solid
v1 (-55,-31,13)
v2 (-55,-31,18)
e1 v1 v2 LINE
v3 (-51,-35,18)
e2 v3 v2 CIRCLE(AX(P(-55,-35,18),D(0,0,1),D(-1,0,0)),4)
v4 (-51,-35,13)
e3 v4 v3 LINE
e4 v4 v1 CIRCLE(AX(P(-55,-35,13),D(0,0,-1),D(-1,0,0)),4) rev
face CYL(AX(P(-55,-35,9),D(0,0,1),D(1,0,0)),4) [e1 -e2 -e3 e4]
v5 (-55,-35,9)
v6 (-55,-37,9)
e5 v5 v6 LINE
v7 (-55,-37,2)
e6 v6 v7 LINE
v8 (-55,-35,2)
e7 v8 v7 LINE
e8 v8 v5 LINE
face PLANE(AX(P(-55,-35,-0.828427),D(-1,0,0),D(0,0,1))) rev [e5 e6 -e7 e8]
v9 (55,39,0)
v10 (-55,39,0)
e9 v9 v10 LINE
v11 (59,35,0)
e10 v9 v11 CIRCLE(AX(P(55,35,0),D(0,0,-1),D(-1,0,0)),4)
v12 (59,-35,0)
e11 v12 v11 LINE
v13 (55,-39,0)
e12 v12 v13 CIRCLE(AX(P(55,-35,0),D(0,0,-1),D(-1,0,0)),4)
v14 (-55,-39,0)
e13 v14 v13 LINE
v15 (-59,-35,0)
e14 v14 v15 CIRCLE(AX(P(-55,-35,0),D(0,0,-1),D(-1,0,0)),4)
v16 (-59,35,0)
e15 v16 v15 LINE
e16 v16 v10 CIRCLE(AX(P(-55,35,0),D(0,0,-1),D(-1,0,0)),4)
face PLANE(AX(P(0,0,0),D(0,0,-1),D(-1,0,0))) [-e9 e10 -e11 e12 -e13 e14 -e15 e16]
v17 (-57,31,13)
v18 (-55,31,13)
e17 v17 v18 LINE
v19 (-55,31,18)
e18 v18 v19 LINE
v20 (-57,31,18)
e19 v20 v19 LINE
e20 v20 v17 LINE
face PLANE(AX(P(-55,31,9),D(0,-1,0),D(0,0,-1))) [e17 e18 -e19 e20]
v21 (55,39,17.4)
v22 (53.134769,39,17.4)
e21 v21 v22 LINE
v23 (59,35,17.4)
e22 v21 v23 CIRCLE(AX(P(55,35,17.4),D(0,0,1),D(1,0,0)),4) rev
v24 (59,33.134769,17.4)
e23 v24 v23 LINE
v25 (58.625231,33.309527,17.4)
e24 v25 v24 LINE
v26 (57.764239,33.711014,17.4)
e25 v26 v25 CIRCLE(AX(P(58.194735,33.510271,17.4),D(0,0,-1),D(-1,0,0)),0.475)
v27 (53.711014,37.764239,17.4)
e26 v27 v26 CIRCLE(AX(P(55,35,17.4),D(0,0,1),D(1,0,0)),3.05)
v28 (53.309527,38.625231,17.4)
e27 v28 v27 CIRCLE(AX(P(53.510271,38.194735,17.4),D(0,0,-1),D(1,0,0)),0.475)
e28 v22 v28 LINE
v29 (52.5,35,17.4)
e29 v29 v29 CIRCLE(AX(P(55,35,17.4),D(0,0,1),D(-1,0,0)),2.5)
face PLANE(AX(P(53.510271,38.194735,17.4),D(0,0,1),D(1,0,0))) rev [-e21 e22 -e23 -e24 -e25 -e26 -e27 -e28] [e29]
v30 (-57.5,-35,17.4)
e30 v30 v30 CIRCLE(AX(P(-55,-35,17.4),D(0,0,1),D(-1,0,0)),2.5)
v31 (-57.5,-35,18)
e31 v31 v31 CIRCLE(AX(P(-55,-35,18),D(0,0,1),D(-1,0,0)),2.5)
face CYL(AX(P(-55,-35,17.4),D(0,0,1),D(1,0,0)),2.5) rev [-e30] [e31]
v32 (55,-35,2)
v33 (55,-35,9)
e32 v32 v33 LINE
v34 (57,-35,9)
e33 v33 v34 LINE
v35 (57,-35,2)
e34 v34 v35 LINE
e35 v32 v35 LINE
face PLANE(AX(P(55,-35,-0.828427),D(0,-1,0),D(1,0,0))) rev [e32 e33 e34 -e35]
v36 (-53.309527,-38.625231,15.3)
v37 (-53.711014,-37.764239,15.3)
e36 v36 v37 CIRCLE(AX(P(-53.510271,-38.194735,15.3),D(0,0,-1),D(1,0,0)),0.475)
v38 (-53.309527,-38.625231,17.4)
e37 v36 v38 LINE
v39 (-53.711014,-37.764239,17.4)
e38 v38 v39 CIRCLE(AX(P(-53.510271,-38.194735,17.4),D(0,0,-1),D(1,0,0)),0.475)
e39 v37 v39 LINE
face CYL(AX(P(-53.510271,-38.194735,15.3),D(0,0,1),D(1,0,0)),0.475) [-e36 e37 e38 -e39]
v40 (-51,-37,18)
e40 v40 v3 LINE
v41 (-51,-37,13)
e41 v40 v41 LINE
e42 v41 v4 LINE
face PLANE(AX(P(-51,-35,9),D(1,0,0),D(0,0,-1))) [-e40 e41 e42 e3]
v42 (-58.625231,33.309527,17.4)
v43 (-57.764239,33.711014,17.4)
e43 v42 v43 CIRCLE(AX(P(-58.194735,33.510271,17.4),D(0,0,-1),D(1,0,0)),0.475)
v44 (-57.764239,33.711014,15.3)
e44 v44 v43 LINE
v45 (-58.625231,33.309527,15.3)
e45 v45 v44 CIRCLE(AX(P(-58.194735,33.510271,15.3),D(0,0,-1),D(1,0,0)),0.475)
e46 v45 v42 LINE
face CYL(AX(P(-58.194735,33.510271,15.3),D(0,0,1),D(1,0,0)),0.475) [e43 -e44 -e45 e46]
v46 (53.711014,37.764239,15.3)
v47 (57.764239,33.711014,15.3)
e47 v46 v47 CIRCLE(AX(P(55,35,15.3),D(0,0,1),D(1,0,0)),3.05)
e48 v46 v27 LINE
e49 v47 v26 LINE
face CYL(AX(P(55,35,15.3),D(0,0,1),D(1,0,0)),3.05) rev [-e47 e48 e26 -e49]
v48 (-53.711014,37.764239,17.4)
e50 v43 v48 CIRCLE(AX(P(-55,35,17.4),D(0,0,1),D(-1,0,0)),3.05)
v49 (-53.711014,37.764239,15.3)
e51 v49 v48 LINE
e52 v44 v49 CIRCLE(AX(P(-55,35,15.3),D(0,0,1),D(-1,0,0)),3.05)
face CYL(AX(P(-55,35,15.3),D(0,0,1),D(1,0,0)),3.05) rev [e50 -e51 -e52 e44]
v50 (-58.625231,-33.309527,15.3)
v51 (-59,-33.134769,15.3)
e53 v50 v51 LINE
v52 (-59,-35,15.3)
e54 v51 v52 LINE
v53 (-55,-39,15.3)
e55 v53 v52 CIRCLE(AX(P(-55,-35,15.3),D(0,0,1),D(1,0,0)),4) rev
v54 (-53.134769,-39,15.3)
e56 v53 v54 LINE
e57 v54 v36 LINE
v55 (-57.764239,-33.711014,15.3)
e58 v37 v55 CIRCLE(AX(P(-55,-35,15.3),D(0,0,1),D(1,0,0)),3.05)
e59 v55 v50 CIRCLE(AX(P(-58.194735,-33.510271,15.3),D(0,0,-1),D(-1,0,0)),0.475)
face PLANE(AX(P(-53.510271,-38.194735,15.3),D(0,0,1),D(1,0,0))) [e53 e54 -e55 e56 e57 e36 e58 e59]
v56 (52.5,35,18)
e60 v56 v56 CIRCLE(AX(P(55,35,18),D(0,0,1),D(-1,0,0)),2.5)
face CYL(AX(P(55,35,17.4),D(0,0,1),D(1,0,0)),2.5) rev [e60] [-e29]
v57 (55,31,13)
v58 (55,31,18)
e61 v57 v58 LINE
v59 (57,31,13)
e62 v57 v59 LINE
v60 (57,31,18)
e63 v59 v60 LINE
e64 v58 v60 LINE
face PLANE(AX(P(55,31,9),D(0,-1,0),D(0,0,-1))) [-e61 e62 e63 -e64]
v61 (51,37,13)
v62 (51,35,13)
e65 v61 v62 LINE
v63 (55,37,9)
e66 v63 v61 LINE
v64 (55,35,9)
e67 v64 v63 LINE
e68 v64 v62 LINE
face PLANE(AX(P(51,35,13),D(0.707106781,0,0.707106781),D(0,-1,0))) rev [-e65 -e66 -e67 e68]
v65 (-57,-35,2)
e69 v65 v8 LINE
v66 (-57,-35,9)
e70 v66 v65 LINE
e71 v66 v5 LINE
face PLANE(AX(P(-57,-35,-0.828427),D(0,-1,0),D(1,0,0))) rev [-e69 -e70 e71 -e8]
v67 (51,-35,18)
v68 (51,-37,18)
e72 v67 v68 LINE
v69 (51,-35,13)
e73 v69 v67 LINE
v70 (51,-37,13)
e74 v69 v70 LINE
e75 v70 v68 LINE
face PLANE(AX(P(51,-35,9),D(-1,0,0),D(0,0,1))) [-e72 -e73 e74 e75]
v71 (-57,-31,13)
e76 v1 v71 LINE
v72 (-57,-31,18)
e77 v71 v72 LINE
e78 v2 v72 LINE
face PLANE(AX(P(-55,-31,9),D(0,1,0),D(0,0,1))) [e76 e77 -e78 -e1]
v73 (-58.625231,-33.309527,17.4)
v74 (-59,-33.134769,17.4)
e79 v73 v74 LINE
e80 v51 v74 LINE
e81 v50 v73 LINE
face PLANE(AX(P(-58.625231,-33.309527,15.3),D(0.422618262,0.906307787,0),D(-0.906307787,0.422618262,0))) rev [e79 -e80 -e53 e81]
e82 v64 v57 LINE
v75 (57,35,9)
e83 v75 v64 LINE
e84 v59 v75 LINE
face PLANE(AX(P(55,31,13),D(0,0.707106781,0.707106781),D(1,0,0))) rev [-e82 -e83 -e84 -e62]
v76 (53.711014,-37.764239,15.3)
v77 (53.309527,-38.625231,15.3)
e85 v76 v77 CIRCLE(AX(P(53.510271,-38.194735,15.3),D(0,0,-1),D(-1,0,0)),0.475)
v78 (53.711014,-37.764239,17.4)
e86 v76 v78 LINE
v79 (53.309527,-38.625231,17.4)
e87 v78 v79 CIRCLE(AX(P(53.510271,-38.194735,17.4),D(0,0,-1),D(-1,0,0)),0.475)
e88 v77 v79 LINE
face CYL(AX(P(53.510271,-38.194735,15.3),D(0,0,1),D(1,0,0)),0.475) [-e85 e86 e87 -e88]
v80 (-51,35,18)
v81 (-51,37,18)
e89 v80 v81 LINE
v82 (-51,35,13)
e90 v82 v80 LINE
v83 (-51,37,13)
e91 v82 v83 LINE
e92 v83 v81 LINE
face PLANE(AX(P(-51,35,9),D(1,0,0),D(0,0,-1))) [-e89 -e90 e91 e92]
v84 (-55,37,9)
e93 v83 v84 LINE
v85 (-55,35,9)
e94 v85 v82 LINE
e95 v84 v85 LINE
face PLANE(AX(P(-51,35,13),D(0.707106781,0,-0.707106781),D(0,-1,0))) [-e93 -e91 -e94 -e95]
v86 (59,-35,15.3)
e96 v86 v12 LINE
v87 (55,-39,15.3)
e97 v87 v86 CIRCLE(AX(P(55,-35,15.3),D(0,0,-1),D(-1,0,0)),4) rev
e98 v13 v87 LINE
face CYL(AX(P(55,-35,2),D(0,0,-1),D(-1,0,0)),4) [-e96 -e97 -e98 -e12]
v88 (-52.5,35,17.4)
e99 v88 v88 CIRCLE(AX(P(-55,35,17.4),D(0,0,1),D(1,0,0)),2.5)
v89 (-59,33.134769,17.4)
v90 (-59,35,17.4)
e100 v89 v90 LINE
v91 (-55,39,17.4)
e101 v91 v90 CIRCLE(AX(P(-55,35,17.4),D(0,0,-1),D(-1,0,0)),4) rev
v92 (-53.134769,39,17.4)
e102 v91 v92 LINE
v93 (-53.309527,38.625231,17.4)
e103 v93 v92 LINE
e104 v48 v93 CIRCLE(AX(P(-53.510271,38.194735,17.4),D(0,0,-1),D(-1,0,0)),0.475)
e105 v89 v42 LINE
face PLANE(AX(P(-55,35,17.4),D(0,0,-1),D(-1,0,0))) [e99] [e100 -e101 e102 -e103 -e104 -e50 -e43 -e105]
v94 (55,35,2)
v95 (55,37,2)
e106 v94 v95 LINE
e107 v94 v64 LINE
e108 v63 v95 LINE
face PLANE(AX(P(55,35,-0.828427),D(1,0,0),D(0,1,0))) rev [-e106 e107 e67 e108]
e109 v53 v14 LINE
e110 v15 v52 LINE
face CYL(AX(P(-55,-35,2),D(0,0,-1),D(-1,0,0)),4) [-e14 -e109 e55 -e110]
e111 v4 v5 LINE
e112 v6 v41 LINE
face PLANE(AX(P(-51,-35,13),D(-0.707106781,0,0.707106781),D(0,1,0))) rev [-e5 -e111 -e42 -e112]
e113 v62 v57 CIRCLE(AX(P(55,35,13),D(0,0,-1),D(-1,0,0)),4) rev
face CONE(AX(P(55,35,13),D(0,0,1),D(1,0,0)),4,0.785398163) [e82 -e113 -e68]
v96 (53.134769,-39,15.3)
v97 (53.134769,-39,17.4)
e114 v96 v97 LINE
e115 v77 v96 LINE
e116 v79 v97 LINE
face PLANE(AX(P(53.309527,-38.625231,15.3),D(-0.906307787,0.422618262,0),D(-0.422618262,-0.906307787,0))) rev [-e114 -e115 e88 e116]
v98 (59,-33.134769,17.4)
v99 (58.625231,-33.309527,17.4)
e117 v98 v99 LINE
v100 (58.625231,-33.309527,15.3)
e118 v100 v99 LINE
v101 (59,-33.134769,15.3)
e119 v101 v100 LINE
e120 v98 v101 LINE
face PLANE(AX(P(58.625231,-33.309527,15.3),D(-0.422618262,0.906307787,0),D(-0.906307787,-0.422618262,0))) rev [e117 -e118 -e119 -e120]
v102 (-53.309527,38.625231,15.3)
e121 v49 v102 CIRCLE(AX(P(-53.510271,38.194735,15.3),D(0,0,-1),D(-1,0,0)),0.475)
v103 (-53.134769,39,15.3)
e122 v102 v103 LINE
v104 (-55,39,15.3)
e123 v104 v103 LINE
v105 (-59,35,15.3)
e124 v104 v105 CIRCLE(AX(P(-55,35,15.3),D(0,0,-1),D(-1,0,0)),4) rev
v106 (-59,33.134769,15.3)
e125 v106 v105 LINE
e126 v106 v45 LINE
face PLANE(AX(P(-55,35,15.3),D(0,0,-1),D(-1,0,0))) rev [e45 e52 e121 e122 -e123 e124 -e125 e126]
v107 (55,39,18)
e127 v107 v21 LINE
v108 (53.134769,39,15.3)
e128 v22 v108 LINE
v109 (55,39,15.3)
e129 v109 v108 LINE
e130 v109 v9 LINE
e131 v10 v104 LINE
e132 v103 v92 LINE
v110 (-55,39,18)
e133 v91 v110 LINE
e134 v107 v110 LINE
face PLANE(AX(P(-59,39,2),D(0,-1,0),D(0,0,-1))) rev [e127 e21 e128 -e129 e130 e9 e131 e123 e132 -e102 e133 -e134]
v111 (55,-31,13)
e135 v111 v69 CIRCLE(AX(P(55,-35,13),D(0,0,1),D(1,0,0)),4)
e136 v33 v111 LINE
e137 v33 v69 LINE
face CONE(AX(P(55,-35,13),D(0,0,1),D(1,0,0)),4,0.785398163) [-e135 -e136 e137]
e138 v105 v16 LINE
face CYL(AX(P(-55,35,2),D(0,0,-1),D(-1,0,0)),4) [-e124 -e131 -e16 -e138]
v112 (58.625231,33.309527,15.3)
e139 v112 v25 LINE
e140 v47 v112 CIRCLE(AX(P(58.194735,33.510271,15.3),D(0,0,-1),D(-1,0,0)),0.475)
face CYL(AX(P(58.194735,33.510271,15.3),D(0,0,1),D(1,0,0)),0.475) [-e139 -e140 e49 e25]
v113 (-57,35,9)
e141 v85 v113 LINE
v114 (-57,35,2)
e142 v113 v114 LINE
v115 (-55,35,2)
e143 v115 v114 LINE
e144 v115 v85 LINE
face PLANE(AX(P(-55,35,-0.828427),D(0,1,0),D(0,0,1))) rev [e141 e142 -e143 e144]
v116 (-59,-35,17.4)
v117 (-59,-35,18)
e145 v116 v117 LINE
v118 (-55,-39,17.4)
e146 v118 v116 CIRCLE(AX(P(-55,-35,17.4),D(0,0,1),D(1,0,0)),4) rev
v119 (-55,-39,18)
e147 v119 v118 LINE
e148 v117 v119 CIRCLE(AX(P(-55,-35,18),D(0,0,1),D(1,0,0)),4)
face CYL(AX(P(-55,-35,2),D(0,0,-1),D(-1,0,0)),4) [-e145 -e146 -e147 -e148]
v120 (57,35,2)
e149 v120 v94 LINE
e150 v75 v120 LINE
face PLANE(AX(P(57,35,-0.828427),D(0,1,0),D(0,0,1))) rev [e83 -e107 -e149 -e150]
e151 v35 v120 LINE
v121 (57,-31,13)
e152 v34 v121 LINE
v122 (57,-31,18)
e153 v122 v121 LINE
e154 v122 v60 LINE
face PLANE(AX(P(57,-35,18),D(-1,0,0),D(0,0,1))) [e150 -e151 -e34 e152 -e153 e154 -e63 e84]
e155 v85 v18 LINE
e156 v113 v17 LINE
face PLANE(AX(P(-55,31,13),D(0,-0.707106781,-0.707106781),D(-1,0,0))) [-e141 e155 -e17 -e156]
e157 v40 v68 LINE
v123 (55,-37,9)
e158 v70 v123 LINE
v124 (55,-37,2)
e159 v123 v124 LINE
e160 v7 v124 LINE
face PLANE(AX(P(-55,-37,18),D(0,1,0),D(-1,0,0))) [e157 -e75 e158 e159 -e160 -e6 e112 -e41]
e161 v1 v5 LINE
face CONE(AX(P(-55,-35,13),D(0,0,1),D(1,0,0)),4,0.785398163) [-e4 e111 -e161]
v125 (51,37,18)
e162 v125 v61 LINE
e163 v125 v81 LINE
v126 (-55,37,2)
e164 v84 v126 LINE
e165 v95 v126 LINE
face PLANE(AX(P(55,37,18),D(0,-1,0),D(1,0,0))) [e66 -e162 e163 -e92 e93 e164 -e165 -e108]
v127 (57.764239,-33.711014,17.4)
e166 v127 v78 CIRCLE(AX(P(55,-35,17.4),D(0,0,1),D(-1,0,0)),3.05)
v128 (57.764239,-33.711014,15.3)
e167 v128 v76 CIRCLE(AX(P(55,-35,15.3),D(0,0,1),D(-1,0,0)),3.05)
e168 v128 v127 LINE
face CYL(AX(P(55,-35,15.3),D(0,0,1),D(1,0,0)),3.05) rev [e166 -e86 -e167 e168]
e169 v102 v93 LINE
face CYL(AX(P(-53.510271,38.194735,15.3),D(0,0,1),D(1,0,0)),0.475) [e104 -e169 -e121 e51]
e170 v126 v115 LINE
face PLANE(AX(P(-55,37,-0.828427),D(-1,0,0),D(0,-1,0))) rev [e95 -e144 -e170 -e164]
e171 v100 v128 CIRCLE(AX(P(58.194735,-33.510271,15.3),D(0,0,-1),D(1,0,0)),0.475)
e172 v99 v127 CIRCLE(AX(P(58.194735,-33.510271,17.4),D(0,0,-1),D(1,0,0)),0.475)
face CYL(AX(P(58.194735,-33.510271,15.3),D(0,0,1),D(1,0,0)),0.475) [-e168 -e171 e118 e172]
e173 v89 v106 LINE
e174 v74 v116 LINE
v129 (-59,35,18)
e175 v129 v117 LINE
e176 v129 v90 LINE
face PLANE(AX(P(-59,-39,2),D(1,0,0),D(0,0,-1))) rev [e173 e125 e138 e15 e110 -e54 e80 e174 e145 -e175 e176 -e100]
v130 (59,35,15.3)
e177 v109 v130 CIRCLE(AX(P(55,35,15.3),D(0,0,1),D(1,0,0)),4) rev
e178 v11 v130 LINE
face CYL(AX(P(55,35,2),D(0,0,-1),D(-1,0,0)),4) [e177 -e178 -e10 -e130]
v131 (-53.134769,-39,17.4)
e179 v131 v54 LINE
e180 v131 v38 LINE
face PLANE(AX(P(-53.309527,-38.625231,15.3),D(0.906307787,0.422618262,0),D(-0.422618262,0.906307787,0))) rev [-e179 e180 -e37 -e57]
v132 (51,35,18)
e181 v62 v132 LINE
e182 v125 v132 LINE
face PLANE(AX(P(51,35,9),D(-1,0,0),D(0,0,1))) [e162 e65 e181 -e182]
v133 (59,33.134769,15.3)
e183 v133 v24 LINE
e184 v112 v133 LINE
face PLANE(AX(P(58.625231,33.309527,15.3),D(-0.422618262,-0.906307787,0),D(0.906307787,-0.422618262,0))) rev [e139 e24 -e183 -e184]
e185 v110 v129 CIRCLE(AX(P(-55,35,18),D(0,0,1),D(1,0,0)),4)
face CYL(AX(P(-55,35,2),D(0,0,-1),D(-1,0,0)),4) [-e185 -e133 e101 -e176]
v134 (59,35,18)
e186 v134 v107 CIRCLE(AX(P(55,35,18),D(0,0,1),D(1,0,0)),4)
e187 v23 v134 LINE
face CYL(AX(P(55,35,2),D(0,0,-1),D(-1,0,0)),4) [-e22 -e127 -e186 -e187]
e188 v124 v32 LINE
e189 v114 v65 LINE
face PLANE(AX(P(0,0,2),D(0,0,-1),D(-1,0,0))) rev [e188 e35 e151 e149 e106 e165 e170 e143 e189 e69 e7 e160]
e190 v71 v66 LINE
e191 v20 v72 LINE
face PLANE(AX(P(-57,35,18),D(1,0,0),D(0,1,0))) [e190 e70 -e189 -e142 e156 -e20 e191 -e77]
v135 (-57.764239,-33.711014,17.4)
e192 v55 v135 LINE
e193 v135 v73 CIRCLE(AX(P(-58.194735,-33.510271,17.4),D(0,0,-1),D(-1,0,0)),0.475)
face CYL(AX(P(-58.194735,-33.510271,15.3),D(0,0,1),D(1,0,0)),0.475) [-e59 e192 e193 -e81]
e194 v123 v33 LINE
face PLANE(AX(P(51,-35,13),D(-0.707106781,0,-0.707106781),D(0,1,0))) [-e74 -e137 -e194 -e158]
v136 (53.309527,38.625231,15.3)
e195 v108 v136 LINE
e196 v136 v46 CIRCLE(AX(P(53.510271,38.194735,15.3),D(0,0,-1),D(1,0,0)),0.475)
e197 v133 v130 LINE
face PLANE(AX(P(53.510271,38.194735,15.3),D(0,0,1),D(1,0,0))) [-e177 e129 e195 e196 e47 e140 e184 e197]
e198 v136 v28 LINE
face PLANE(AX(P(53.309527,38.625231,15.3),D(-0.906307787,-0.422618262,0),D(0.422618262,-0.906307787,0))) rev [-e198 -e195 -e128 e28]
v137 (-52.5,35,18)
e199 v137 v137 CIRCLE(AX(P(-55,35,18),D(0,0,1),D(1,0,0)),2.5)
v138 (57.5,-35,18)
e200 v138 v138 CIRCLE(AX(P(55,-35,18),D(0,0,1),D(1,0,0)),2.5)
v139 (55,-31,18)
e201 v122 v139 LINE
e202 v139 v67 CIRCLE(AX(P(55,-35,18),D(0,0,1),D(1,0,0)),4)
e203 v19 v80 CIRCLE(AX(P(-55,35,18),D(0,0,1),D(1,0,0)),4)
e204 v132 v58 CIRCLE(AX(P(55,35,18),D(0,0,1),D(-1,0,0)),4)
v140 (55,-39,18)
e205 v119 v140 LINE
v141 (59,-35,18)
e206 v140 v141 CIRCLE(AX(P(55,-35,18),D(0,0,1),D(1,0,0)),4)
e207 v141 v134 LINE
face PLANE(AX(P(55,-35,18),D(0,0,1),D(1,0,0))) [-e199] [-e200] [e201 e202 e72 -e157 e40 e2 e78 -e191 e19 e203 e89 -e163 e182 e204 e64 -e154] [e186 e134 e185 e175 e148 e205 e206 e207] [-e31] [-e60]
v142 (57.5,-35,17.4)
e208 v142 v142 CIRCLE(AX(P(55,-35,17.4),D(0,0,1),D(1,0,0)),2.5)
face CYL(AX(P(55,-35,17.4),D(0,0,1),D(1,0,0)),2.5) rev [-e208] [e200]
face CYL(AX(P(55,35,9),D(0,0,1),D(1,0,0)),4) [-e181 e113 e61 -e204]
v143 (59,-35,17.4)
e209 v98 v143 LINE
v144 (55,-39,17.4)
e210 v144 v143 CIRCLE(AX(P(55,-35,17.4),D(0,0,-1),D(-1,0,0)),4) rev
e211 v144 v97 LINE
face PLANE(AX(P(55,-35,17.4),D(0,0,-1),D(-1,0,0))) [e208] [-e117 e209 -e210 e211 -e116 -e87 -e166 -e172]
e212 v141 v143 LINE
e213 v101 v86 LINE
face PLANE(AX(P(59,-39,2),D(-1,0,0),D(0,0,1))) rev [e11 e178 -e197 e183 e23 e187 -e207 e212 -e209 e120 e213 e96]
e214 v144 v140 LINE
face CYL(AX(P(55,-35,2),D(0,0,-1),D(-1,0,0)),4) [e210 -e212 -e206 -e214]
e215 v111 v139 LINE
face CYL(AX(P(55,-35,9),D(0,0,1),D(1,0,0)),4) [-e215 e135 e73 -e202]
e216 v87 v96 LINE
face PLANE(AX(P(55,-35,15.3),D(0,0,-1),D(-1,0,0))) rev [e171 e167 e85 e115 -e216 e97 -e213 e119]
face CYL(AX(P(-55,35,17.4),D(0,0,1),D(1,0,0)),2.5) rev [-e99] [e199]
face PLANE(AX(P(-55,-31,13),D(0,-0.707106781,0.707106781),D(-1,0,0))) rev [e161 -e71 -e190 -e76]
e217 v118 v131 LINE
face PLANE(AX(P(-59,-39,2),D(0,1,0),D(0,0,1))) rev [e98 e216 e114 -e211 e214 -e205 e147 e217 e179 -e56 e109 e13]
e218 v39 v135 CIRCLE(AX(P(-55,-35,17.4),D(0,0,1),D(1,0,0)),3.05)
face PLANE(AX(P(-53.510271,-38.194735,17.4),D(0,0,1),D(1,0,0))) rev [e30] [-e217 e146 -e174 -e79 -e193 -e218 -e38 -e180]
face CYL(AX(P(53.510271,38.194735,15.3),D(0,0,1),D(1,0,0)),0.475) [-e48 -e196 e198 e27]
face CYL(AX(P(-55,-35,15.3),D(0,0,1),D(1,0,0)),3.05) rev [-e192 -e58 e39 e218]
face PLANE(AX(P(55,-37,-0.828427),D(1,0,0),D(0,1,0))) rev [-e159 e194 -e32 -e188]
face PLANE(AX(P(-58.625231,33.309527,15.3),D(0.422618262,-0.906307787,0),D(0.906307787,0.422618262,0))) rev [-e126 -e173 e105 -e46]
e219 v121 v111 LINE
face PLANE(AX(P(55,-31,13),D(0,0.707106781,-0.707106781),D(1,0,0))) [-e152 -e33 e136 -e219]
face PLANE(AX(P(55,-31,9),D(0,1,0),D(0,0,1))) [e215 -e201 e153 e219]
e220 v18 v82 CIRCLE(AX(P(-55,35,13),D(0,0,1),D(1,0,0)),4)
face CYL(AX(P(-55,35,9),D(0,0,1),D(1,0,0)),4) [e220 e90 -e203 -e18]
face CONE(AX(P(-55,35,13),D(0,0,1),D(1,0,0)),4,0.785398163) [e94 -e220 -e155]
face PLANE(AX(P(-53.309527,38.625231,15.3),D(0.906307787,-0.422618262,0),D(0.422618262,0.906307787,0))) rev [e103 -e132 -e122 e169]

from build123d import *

# Parameters (mm, degrees)
SKETCH_1_W          = 118
SKETCH_1_H          = 78
EXTRUDE_1_DEPTH     = 2
FILLET_1_R          = 4
EXTRUDE_START       = 16
EXTRUDE_4_DEPTH     = 16
EXTRUDE_5_DEPTH     = 9
SKETCH_6_R          = 2.5
CUT_EXTRUDE_1_DEPTH = 0.6
CUT_EXTRUDE_2_DEPTH = 2.1
CHAMFER_1_SIZE      = 4
EXTRUDE_6_DEPTH     = 7


with BuildPart() as part:
    # 草图1 → 凸台-拉伸1 (new body)
    with BuildSketch(Plane.XY):
        Rectangle(SKETCH_1_W, SKETCH_1_H)
    extrude(amount=EXTRUDE_1_DEPTH)

    # 圆角1
    fillet_1_edges = [part.edges().sort_by_distance(p)[0] for p in [
        (59, -39, 1),
        (-59, -39, 1),
        (-59, 39, 1),
        (59, 39, 1),
    ]]
    fillet(fillet_1_edges, radius=FILLET_1_R)

    # 草图4 → 凸台-拉伸4 (add)
    with BuildSketch(Plane.XY.offset(2).offset(EXTRUDE_START)):
        with BuildLine():
            Line((59, -35), (59, 35))
            ThreePointArc((59, 35), (57.828427125, 37.828427125), (55, 39))
            Line((55, 39), (-55, 39))
            ThreePointArc((-55, 39), (-57.828427125, 37.828427125), (-59, 35))
            Line((-59, 35), (-59, -35))
            ThreePointArc((-59, -35), (-57.828427125, -37.828427125), (-55, -39))
            Line((-55, -39), (55, -39))
            ThreePointArc((55, -39), (57.828427125, -37.828427125), (59, -35))
        make_face()
        with BuildLine():
            Line((57, -35), (57, 35))
            ThreePointArc((57, 35), (56.414213562, 36.414213562), (55, 37))
            Line((55, 37), (-55, 37))
            ThreePointArc((-55, 37), (-56.414213562, 36.414213562), (-57, 35))
            Line((-57, 35), (-57, -35))
            ThreePointArc((-57, -35), (-56.414213562, -36.414213562), (-55, -37))
            Line((-55, -37), (55, -37))
            ThreePointArc((55, -37), (56.414213562, -36.414213562), (57, -35))
        make_face(mode=Mode.SUBTRACT)
    extrude(amount=-EXTRUDE_4_DEPTH)

    # 草图5 → 凸台-拉伸5 (add)
    with BuildSketch(Plane.XY.offset(18)):
        with BuildLine():
            Line((-51, 35), (-51, 39))
            Line((-51, 39), (-55, 39))
            ThreePointArc((-55, 39), (-57.828427125, 37.828427125), (-59, 35))
            Line((-59, 35), (-59, 31))
            Line((-59, 31), (-55, 31))
            ThreePointArc((-55, 31), (-52.171572875, 32.171572875), (-51, 35))
        make_face()
        with BuildLine():
            Line((51, 39), (55, 39))
            ThreePointArc((55, 39), (57.828427125, 37.828427125), (59, 35))
            Line((59, 35), (59, 31))
            Line((59, 31), (55, 31))
            ThreePointArc((55, 31), (52.171572875, 32.171572875), (51, 35))
            Line((51, 35), (51, 39))
        make_face()
        with BuildLine():
            Line((51, -35), (51, -39))
            Line((51, -39), (55, -39))
            ThreePointArc((55, -39), (57.828427125, -37.828427125), (59, -35))
            Line((59, -35), (59, -31))
            Line((59, -31), (55, -31))
            ThreePointArc((55, -31), (52.171572875, -32.171572875), (51, -35))
        make_face()
        with BuildLine():
            Line((-51, -39), (-55, -39))
            ThreePointArc((-55, -39), (-57.828427125, -37.828427125), (-59, -35))
            Line((-59, -35), (-59, -31))
            Line((-59, -31), (-55, -31))
            ThreePointArc((-55, -31), (-52.171572875, -32.171572875), (-51, -35))
            Line((-51, -35), (-51, -39))
        make_face()
    extrude(amount=-EXTRUDE_5_DEPTH)

    # 草图6 → 切除-拉伸1 (cut)
    with BuildSketch(Plane.XY.offset(18)):
        with Locations((-55, 35)):
            Circle(SKETCH_6_R)
        with Locations(Location((55, 35, 0), (0, 0, 180))):
            Circle(SKETCH_6_R)
        with Locations((55, -35)):
            Circle(SKETCH_6_R)
        with Locations(Location((-55, -35, 0), (0, 0, 180))):
            Circle(SKETCH_6_R)
    extrude(amount=-CUT_EXTRUDE_1_DEPTH, mode=Mode.SUBTRACT)

    # 草图7 → 切除-拉伸2 (cut)
    with BuildSketch(Plane.XY.offset(17.4)):
        with BuildLine():
            Line((53.309526953, 38.625231148), (52.886908691, 39.531538935))
            ThreePointArc((52.886908691, 39.531538935), (58.535533906, 38.535533906), (59.531538935, 32.886908691))
            Line((59.531538935, 32.886908691), (58.625231148, 33.309526953))
            ThreePointArc((58.625231148, 33.309526953), (58.395478624, 33.940766826), (57.76423875, 33.711014302))
            ThreePointArc((57.76423875, 33.711014302), (52.843324317, 32.843324317), (53.711014302, 37.76423875))
            ThreePointArc((53.711014302, 37.76423875), (53.940766826, 38.395478624), (53.309526953, 38.625231148))
        make_face()
        with BuildLine():
            Line((-58.625231148, 33.309526953), (-59.531538935, 32.886908691))
            ThreePointArc((-59.531538935, 32.886908691), (-58.535533906, 38.535533906), (-52.886908691, 39.531538935))
            Line((-52.886908691, 39.531538935), (-53.309526953, 38.625231148))
            ThreePointArc((-53.309526953, 38.625231148), (-53.940766826, 38.395478624), (-53.711014302, 37.76423875))
            ThreePointArc((-53.711014302, 37.76423875), (-52.843324317, 32.843324317), (-57.76423875, 33.711014302))
            ThreePointArc((-57.76423875, 33.711014302), (-58.395478624, 33.940766826), (-58.625231148, 33.309526953))
        make_face()
        with BuildLine():
            Line((58.625231148, -33.309526953), (59.531538935, -32.886908691))
            ThreePointArc((59.531538935, -32.886908691), (58.535533906, -38.535533906), (52.886908691, -39.531538935))
            Line((52.886908691, -39.531538935), (53.309526953, -38.625231148))
            ThreePointArc((53.309526953, -38.625231148), (53.940766826, -38.395478624), (53.711014302, -37.76423875))
            ThreePointArc((53.711014302, -37.76423875), (52.843324317, -32.843324317), (57.76423875, -33.711014302))
            ThreePointArc((57.76423875, -33.711014302), (58.395478624, -33.940766826), (58.625231148, -33.309526953))
        make_face()
        with BuildLine():
            Line((-53.309526953, -38.625231148), (-52.886908691, -39.531538935))
            ThreePointArc((-52.886908691, -39.531538935), (-58.535533906, -38.535533906), (-59.531538935, -32.886908691))
            Line((-59.531538935, -32.886908691), (-58.625231148, -33.309526953))
            ThreePointArc((-58.625231148, -33.309526953), (-58.395478624, -33.940766826), (-57.76423875, -33.711014302))
            ThreePointArc((-57.76423875, -33.711014302), (-52.843324317, -32.843324317), (-53.711014302, -37.76423875))
            ThreePointArc((-53.711014302, -37.76423875), (-53.940766826, -38.395478624), (-53.309526953, -38.625231148))
        make_face()
    extrude(amount=-CUT_EXTRUDE_2_DEPTH, mode=Mode.SUBTRACT)

    # 倒角1
    chamfer_1_edges = [part.edges().sort_by_distance(p)[0] for p in [
        (-56, 31, 9),
        (-51, 36, 9),
        (-52.171572875, 32.171572875, 9),
        (51, 36, 9),
        (56, 31, 9),
        (52.171572875, 32.171572875, 9),
        (56, -31, 9),
        (51, -36, 9),
        (52.171572875, -32.171572875, 9),
        (-56, -31, 9),
        (-51, -36, 9),
        (-52.171572875, -32.171572875, 9),
    ]]
    chamfer(chamfer_1_edges, length=CHAMFER_1_SIZE - 0.0001)  # a hair under: the kernel refuses the full size

    # 草图8 → 凸台-拉伸6 (add)
    with BuildSketch(Plane(origin=(0, 0, 9), x_dir=(-1, 0, 0), z_dir=(0, 0, -1))):
        with BuildLine():
            Line((-55, -37), (-55, -35))
            Line((-55, -35), (-57, -35))
            ThreePointArc((-57, -35), (-56.414213562, -36.414213562), (-55, -37))
        make_face()
        with BuildLine():
            Line((57, -35), (55, -35))
            Line((55, -35), (55, -37))
            ThreePointArc((55, -37), (56.414213562, -36.414213562), (57, -35))
        make_face()
        with BuildLine():
            Line((55, 37), (55, 35))
            Line((55, 35), (57, 35))
            ThreePointArc((57, 35), (56.414213562, 36.414213562), (55, 37))
        make_face()
        with BuildLine():
            Line((-57, 35), (-55, 35))
            Line((-55, 35), (-55, 37))
            ThreePointArc((-55, 37), (-56.414213562, 36.414213562), (-57, 35))
        make_face()
    extrude(amount=EXTRUDE_6_DEPTH)


solid = part.part
